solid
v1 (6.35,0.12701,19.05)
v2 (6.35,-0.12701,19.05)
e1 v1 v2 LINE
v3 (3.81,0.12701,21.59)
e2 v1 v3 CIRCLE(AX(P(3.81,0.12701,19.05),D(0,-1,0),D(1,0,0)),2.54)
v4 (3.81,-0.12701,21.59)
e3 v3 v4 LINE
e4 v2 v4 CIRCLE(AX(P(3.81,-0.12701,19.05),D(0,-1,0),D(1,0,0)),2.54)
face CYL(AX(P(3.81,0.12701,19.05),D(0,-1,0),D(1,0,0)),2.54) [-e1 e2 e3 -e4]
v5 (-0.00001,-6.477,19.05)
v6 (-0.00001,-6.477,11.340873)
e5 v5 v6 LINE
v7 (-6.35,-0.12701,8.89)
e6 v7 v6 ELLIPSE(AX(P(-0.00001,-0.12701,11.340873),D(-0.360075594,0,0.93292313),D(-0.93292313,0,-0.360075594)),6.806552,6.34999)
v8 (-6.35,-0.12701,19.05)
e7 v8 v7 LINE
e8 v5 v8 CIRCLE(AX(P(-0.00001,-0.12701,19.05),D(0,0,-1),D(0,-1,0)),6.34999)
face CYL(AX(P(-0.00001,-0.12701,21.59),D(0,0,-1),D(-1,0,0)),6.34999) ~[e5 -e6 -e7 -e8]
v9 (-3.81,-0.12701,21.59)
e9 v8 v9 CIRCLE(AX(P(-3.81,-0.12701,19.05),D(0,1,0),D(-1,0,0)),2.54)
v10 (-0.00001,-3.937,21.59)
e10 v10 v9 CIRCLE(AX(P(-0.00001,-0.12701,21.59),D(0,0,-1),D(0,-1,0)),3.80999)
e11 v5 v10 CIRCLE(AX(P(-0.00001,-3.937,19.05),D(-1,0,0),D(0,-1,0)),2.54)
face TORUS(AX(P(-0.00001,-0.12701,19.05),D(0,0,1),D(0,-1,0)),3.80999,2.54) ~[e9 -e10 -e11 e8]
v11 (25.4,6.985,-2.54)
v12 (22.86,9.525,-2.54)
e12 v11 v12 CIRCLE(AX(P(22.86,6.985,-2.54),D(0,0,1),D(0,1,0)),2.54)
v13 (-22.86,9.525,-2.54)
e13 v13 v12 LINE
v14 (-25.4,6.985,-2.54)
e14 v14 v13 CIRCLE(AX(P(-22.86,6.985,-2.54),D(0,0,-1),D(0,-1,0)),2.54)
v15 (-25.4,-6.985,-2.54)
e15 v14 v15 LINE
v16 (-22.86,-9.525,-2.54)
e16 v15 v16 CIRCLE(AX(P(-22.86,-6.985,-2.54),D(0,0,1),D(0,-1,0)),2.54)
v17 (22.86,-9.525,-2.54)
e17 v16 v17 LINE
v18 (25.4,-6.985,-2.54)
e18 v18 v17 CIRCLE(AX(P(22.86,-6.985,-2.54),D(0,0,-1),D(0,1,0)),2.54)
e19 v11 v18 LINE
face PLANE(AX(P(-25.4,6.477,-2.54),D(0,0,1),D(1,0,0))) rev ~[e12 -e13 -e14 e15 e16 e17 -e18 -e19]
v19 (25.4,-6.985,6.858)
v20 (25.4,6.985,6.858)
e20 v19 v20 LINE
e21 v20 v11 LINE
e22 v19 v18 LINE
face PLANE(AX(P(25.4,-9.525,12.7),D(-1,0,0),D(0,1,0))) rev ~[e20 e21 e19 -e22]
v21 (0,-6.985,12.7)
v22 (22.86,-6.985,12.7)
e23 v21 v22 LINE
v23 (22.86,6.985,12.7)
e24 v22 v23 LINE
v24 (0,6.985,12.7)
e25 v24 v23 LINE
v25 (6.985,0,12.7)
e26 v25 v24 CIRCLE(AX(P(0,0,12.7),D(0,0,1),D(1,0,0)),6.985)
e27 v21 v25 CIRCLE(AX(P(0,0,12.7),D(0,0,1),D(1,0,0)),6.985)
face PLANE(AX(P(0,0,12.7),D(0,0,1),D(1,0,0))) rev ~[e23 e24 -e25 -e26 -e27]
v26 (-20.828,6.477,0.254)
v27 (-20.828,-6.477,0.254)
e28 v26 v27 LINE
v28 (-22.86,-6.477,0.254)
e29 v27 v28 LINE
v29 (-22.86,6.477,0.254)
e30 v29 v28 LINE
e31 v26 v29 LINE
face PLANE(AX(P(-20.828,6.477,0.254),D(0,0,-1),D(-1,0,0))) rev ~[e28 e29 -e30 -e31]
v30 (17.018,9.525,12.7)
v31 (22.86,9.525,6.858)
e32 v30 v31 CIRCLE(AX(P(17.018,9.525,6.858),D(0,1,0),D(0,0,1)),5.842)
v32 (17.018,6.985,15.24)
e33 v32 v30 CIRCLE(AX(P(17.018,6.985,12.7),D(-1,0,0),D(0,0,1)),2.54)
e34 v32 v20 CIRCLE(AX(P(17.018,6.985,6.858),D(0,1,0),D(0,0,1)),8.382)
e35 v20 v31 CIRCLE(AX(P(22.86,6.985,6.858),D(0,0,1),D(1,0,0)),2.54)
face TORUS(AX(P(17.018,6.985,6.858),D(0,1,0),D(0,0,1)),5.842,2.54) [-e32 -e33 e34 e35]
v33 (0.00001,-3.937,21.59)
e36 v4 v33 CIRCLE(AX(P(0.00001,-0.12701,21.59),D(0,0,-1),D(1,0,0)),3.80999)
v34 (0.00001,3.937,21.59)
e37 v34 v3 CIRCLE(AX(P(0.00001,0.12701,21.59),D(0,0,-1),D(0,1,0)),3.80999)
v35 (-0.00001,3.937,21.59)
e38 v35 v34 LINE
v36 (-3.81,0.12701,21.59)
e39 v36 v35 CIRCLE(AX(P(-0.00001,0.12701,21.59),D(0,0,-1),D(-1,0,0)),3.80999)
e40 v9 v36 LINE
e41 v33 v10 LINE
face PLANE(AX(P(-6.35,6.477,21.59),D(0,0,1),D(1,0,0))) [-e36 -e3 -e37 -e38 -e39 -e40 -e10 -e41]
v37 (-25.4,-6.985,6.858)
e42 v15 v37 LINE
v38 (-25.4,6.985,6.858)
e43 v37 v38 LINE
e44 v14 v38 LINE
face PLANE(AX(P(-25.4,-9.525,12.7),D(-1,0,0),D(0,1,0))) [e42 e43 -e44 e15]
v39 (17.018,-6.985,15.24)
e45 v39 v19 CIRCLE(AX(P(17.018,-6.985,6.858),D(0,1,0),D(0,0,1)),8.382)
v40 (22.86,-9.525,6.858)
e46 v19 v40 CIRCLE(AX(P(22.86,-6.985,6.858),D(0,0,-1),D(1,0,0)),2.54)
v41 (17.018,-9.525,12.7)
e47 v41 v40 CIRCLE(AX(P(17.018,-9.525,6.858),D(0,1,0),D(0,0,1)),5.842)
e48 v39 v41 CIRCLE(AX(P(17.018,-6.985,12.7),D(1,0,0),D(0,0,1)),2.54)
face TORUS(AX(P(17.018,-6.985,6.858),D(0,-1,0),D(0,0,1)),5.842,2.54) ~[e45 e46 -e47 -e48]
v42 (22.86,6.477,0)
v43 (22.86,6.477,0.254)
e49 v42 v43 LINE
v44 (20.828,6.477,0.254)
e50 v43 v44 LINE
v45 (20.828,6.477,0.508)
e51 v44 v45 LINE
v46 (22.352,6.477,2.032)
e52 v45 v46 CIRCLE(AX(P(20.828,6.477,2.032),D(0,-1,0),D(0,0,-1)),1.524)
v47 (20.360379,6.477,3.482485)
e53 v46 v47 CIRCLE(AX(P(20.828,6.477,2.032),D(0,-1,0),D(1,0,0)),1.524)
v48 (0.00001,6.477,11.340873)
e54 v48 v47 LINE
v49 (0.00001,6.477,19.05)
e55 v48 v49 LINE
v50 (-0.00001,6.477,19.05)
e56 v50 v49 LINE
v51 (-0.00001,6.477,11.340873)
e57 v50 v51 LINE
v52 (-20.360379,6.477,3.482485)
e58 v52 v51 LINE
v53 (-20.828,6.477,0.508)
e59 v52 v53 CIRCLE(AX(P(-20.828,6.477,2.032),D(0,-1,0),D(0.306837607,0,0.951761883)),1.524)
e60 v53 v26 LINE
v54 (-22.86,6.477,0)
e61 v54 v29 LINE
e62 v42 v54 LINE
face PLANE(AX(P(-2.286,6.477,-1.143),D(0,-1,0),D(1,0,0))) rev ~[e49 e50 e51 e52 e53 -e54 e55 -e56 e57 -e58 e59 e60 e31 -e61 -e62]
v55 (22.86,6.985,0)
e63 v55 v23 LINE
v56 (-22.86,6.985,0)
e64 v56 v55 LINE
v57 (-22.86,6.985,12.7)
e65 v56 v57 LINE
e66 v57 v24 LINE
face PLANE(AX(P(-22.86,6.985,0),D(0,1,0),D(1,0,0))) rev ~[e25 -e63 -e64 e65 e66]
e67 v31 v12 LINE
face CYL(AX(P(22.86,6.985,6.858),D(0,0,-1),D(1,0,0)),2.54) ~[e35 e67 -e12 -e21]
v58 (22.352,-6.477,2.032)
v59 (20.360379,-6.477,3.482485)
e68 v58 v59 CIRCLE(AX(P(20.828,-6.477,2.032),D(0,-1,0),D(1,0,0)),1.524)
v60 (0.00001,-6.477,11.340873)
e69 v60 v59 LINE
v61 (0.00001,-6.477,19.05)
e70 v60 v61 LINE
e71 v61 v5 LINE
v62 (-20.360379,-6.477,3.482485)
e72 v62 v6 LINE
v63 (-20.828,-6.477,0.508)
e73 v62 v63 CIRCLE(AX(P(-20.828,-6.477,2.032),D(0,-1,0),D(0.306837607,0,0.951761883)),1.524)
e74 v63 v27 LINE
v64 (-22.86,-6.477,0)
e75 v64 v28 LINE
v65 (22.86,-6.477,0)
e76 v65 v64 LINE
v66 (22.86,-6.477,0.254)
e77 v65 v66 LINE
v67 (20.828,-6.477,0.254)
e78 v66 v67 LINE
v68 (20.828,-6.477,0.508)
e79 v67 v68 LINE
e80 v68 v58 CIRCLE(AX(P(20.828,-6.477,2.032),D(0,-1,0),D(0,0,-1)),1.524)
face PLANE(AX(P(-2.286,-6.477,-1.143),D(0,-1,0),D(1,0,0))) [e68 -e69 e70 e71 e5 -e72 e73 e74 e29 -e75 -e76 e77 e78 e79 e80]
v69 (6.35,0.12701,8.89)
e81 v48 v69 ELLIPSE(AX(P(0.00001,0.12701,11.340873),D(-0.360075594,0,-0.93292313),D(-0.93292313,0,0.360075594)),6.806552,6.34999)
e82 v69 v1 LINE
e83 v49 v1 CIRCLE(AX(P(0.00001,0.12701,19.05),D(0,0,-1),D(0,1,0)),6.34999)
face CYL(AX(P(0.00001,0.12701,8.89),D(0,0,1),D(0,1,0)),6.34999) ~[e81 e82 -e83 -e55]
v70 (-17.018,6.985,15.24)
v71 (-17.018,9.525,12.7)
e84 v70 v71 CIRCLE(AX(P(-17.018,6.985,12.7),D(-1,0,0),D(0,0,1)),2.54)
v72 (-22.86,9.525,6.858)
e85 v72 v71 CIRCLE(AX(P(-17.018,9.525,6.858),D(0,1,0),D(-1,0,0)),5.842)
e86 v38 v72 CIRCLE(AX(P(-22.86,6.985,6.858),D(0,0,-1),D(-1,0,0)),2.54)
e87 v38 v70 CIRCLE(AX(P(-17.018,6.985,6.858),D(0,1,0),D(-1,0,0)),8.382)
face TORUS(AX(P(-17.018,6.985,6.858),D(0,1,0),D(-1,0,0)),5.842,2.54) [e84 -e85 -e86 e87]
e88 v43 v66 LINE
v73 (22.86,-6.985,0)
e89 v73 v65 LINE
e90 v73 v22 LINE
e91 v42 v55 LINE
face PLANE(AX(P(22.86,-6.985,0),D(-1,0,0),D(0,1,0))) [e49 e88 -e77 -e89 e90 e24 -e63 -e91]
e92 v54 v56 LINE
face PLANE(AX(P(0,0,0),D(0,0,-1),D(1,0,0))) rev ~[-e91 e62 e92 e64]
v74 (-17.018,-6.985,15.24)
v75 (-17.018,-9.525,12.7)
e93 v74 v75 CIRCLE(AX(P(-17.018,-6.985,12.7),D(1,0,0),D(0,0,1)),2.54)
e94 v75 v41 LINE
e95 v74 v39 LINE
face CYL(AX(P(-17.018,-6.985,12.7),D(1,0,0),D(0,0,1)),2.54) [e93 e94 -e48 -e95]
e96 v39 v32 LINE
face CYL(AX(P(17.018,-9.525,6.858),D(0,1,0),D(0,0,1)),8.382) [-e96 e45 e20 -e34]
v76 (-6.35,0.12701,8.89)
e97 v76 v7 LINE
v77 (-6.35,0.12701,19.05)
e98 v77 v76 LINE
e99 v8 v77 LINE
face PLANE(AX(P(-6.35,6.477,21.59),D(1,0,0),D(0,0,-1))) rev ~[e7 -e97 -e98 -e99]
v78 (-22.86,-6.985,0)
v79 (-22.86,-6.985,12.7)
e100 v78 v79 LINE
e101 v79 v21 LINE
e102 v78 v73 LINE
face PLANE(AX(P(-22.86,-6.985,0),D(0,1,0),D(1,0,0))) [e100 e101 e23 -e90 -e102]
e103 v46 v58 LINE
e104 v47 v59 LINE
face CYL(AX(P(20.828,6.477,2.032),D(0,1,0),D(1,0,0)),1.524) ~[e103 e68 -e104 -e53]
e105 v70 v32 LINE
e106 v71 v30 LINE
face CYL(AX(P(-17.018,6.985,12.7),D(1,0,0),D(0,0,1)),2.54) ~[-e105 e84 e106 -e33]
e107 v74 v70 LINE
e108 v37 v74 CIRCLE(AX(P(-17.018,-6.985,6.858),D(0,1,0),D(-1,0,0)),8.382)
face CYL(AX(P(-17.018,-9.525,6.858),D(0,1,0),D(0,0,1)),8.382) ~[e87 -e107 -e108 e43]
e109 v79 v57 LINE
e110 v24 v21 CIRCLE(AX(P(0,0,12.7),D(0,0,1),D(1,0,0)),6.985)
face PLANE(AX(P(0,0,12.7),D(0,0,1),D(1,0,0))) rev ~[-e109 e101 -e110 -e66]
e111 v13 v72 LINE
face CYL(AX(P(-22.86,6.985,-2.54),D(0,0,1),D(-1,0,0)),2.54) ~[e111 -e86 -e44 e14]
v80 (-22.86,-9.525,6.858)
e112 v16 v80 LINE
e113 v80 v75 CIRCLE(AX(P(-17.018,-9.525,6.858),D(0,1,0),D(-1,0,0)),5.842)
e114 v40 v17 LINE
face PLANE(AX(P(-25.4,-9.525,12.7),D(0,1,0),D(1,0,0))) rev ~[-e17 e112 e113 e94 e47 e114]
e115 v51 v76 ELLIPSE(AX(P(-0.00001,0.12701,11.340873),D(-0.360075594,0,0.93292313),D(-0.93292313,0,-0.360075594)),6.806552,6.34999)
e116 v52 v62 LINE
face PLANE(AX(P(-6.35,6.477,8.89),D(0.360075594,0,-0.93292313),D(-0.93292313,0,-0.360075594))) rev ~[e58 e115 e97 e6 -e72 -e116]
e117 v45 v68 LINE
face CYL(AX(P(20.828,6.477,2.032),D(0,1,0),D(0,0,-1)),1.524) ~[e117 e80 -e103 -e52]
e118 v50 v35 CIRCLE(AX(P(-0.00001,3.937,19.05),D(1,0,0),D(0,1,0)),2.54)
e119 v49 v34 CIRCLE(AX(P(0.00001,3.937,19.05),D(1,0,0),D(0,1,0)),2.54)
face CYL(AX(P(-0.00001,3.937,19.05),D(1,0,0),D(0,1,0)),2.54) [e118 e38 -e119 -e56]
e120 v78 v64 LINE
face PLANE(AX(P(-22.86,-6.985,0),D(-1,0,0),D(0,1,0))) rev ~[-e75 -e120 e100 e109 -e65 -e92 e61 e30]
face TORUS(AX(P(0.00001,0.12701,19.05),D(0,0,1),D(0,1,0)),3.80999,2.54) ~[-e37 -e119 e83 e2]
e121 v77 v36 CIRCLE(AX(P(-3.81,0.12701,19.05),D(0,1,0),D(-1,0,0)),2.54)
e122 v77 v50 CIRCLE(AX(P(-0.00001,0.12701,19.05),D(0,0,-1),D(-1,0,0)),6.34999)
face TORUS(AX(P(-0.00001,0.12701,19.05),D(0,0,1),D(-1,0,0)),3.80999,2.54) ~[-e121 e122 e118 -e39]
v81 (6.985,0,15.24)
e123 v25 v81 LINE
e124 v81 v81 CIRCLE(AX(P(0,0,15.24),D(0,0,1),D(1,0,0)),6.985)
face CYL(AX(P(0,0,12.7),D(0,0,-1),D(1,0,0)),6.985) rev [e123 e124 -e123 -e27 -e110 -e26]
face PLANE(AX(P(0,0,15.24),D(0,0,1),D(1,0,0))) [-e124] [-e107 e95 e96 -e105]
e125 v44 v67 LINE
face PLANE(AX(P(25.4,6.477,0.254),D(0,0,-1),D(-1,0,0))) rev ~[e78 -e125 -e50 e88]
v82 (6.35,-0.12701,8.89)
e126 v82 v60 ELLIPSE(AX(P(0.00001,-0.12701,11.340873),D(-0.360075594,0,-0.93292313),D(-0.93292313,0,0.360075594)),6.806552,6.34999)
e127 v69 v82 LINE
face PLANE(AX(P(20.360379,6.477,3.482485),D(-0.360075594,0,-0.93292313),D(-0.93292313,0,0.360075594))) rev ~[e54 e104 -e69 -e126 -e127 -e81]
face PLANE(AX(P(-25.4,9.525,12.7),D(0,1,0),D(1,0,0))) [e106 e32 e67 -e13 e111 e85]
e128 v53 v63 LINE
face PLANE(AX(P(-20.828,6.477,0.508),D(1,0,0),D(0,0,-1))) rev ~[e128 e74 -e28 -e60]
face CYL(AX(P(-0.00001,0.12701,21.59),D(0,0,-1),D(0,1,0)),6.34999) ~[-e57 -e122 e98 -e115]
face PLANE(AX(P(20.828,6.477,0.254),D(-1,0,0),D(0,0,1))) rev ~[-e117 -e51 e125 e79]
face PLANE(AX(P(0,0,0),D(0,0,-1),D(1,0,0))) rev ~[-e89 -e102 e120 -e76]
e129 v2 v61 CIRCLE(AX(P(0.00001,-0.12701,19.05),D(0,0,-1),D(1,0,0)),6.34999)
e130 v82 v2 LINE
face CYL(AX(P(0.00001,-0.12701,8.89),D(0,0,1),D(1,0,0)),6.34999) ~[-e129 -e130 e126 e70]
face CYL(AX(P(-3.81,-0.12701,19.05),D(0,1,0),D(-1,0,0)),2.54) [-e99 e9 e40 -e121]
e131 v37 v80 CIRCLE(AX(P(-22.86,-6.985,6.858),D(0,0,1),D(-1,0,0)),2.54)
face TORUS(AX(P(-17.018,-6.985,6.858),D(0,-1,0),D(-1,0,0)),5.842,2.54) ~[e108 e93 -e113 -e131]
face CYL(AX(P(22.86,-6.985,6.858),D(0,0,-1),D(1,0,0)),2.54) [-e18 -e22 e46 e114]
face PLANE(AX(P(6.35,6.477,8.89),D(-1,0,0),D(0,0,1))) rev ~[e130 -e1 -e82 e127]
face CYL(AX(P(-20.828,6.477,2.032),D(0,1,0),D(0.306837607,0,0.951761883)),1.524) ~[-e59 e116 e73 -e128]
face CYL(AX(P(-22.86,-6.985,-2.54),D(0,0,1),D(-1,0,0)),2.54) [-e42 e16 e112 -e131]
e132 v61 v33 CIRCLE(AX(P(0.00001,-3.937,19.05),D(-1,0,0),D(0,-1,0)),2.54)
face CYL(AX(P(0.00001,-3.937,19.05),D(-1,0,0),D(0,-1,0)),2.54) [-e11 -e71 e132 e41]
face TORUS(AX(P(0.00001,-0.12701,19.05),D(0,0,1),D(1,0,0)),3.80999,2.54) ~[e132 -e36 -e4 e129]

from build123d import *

# Parameters (mm, degrees)
F0_W     = 50.8
F0_H     = 19.05
F0_W_2   = 45.72
F0_H_2   = 13.97
F1_DEPTH = 12.7
F2_W     = 50.8
F2_H     = 19.05
F3_DEPTH = 2.54
F5_START = 0.508
F4_W     = 4.572
F4_H     = 2.794
F4_W_2   = 12.7
F4_H_2   = 5.08
F4_H_3   = 3.81
F5_DEPTH = 12.954
F6_R     = 6.34999
F7_W     = 50.8
F7_H     = 19.05
F7_R     = 6.985
F8_DEPTH = 2.54
F9_R     = 2.54
F10_R    = 8.382
F11_R    = 2.54


# Not quite as in the source:
# - a fillet or chamfer is up to 0.001 mm smaller than in the source, because OpenCascade refuses the exact size


with BuildPart() as f1:
    # F0 (on Top) → F1 (new body)
    with BuildSketch(Plane.XY):
        Rectangle(F0_W, F0_H)
        Rectangle(F0_W_2, F0_H_2, mode=Mode.SUBTRACT)
    extrude(amount=F1_DEPTH)

    # F2 (on face) → F3 (join)
    with BuildSketch(Plane(origin=(0, 0, 0), x_dir=(1, 0, 0), z_dir=(0, 0, -1))):
        Rectangle(F2_W, F2_H)
    extrude(amount=F3_DEPTH)

    # F4 (on face) → F5 (join)
    with BuildSketch(Plane.XZ.offset(-6.985).offset(F5_START)):
        Polygon((-25.4, 0.254), (-25.4, -2.54), (20.828, -2.54), (20.828, 0.254), (-20.828, 0.254), align=None)
        with Locations((23.114, -1.143)):
            Rectangle(F4_W, F4_H)
        with BuildLine():
            Line((-20.828, 0.254), (20.828, 0.254))
            Line((20.828, 0.254), (20.828, 0.508))
            ThreePointArc((20.828, 0.508), (19.7166563034, 0.9891715443), (19.3070802744, 2.1288462099))
            Line((19.3070802744, 2.1288462099), (5.08, 7.62))
            Line((5.08, 7.62), (-5.08, 7.62))
            Line((-5.08, 7.62), (-19.3070802744, 2.1288462099))
            ThreePointArc((-19.3070802744, 2.1288462099), (-19.3047702633, 2.0804475914), (-19.304, 2.032))
            ThreePointArc((-19.304, 2.032), (-19.7503692655, 0.9543692655), (-20.828, 0.508))
            Line((-20.828, 0.508), (-20.828, 0.254))
        make_face()
        with BuildLine():
            ThreePointArc((19.3070802744, 2.1288462099), (19.7166563034, 0.9891715443), (20.828, 0.508))
            Line((20.828, 0.508), (20.828, 2.032))
            Line((20.828, 2.032), (19.558, 2.032))
            Line((19.558, 2.032), (19.3070802744, 2.1288462099))
        make_face()
        with BuildLine():
            Line((20.828, 2.032), (20.828, 0.508))
            ThreePointArc((20.828, 0.508), (21.9056307345, 0.9543692655), (22.352, 2.032))
            ThreePointArc((22.352, 2.032), (21.7251962822, 3.2639151071), (20.3603794867, 3.4824851104))
            Line((20.3603794867, 3.4824851104), (20.828, 3.302))
            Line((20.828, 3.302), (20.828, 2.032))
        make_face()
        with BuildLine():
            ThreePointArc((-20.3603794867, 3.4824851104), (-22.3335091013, 2.2686819509), (-20.828, 0.508))
            Line((-20.828, 0.508), (-20.828, 2.032))
            Line((-20.828, 2.032), (-20.828, 3.302))
            Line((-20.828, 3.302), (-20.3603794867, 3.4824851104))
        make_face()
        with BuildLine():
            Line((-20.828, 2.032), (-20.828, 0.508))
            ThreePointArc((-20.828, 0.508), (-19.7503692655, 0.9543692655), (-19.304, 2.032))
            ThreePointArc((-19.304, 2.032), (-19.3047702633, 2.0804475914), (-19.3070802744, 2.1288462099))
            Line((-19.3070802744, 2.1288462099), (-19.558, 2.032))
            Line((-19.558, 2.032), (-20.828, 2.032))
        make_face()
        with BuildLine():
            Line((19.558, 2.032), (20.828, 2.032))
            Line((20.828, 2.032), (20.828, 3.302))
            Line((20.828, 3.302), (20.3603794867, 3.4824851104))
            ThreePointArc((20.3603794867, 3.4824851104), (19.6252291828, 2.9679051027), (19.3070802744, 2.1288462099))
            Line((19.3070802744, 2.1288462099), (19.558, 2.032))
        make_face()
        with BuildLine():
            Line((5.08, 7.62), (19.3070802744, 2.1288462099))
            ThreePointArc((19.3070802744, 2.1288462099), (19.6252291828, 2.9679051027), (20.3603794867, 3.4824851104))
            Line((20.3603794867, 3.4824851104), (6.35, 8.89))
            Line((6.35, 8.89), (6.35, 7.62))
            Line((6.35, 7.62), (5.08, 7.62))
        make_face()
        with BuildLine():
            Line((-20.828, 3.302), (-20.828, 2.032))
            Line((-20.828, 2.032), (-19.558, 2.032))
            Line((-19.558, 2.032), (-19.3070802744, 2.1288462099))
            ThreePointArc((-19.3070802744, 2.1288462099), (-19.6252291828, 2.9679051027), (-20.3603794867, 3.4824851104))
            Line((-20.3603794867, 3.4824851104), (-20.828, 3.302))
        make_face()
        with BuildLine():
            Line((-6.35, 8.89), (-20.3603794867, 3.4824851104))
            ThreePointArc((-20.3603794867, 3.4824851104), (-19.6252291828, 2.9679051027), (-19.3070802744, 2.1288462099))
            Line((-19.3070802744, 2.1288462099), (-5.08, 7.62))
            Line((-5.08, 7.62), (-6.35, 7.62))
            Line((-6.35, 7.62), (-6.35, 8.89))
        make_face()
        Polygon((-5.08, 7.62), (5.08, 7.62), (6.35, 7.62), (6.35, 8.89), (6.35, 12.7), (-6.35, 12.7), (-6.35, 8.89), (-6.35, 7.62), align=None)
        with Locations((0, 15.24)):
            Rectangle(F4_W_2, F4_H_2)
        with Locations((0, 19.685)):
            Rectangle(F4_W_2, F4_H_3)
    extrude(amount=F5_DEPTH)

    # F6 (radius 6.35 in the source; OpenCascade refuses exactly that, so slightly less here)
    f6_edges = [f1.edges().sort_by_distance(p)[0] for p in [
        (-6.35, -6.477, 15.24),
        (6.35, -6.477, 15.24),
        (6.35, 6.477, 15.24),
        (-6.35, 6.477, 15.24),
    ]]
    fillet(f6_edges, radius=F6_R)

    # F7 (on face) → F8 (join)
    with BuildSketch(Plane.XY.offset(12.7)):
        Rectangle(F7_W, F7_H)
        Circle(F7_R, mode=Mode.SUBTRACT)
    extrude(amount=F8_DEPTH)

    # F9
    f9_edges = [f1.edges().sort_by_distance(p)[0] for p in [
        (4.490131, -4.617131, 21.59),
    ]]
    fillet(f9_edges, radius=F9_R)

    # F10
    f10_edges = [f1.edges().sort_by_distance(p)[0] for p in [
        (25.4, 0, 15.24),
        (-25.4, 0, 15.24),
    ]]
    fillet(f10_edges, radius=F10_R)

    # F11
    f11_edges = [f1.edges().sort_by_distance(p)[0] for p in [
        (0, 9.525, 15.24),
        (0, -9.525, 15.24),
        (-22.944969, -9.525, 12.784969),
        (-22.944969, 9.525, 12.784969),
        (-25.4, 9.525, 2.159),
        (-25.4, -9.525, 2.159),
        (25.4, 9.525, 2.159),
        (22.944969, 9.525, 12.784969),
        (22.944969, -9.525, 12.784969),
        (25.4, -9.525, 2.159),
    ]]
    fillet(f11_edges, radius=F11_R)


solid = f1.part
